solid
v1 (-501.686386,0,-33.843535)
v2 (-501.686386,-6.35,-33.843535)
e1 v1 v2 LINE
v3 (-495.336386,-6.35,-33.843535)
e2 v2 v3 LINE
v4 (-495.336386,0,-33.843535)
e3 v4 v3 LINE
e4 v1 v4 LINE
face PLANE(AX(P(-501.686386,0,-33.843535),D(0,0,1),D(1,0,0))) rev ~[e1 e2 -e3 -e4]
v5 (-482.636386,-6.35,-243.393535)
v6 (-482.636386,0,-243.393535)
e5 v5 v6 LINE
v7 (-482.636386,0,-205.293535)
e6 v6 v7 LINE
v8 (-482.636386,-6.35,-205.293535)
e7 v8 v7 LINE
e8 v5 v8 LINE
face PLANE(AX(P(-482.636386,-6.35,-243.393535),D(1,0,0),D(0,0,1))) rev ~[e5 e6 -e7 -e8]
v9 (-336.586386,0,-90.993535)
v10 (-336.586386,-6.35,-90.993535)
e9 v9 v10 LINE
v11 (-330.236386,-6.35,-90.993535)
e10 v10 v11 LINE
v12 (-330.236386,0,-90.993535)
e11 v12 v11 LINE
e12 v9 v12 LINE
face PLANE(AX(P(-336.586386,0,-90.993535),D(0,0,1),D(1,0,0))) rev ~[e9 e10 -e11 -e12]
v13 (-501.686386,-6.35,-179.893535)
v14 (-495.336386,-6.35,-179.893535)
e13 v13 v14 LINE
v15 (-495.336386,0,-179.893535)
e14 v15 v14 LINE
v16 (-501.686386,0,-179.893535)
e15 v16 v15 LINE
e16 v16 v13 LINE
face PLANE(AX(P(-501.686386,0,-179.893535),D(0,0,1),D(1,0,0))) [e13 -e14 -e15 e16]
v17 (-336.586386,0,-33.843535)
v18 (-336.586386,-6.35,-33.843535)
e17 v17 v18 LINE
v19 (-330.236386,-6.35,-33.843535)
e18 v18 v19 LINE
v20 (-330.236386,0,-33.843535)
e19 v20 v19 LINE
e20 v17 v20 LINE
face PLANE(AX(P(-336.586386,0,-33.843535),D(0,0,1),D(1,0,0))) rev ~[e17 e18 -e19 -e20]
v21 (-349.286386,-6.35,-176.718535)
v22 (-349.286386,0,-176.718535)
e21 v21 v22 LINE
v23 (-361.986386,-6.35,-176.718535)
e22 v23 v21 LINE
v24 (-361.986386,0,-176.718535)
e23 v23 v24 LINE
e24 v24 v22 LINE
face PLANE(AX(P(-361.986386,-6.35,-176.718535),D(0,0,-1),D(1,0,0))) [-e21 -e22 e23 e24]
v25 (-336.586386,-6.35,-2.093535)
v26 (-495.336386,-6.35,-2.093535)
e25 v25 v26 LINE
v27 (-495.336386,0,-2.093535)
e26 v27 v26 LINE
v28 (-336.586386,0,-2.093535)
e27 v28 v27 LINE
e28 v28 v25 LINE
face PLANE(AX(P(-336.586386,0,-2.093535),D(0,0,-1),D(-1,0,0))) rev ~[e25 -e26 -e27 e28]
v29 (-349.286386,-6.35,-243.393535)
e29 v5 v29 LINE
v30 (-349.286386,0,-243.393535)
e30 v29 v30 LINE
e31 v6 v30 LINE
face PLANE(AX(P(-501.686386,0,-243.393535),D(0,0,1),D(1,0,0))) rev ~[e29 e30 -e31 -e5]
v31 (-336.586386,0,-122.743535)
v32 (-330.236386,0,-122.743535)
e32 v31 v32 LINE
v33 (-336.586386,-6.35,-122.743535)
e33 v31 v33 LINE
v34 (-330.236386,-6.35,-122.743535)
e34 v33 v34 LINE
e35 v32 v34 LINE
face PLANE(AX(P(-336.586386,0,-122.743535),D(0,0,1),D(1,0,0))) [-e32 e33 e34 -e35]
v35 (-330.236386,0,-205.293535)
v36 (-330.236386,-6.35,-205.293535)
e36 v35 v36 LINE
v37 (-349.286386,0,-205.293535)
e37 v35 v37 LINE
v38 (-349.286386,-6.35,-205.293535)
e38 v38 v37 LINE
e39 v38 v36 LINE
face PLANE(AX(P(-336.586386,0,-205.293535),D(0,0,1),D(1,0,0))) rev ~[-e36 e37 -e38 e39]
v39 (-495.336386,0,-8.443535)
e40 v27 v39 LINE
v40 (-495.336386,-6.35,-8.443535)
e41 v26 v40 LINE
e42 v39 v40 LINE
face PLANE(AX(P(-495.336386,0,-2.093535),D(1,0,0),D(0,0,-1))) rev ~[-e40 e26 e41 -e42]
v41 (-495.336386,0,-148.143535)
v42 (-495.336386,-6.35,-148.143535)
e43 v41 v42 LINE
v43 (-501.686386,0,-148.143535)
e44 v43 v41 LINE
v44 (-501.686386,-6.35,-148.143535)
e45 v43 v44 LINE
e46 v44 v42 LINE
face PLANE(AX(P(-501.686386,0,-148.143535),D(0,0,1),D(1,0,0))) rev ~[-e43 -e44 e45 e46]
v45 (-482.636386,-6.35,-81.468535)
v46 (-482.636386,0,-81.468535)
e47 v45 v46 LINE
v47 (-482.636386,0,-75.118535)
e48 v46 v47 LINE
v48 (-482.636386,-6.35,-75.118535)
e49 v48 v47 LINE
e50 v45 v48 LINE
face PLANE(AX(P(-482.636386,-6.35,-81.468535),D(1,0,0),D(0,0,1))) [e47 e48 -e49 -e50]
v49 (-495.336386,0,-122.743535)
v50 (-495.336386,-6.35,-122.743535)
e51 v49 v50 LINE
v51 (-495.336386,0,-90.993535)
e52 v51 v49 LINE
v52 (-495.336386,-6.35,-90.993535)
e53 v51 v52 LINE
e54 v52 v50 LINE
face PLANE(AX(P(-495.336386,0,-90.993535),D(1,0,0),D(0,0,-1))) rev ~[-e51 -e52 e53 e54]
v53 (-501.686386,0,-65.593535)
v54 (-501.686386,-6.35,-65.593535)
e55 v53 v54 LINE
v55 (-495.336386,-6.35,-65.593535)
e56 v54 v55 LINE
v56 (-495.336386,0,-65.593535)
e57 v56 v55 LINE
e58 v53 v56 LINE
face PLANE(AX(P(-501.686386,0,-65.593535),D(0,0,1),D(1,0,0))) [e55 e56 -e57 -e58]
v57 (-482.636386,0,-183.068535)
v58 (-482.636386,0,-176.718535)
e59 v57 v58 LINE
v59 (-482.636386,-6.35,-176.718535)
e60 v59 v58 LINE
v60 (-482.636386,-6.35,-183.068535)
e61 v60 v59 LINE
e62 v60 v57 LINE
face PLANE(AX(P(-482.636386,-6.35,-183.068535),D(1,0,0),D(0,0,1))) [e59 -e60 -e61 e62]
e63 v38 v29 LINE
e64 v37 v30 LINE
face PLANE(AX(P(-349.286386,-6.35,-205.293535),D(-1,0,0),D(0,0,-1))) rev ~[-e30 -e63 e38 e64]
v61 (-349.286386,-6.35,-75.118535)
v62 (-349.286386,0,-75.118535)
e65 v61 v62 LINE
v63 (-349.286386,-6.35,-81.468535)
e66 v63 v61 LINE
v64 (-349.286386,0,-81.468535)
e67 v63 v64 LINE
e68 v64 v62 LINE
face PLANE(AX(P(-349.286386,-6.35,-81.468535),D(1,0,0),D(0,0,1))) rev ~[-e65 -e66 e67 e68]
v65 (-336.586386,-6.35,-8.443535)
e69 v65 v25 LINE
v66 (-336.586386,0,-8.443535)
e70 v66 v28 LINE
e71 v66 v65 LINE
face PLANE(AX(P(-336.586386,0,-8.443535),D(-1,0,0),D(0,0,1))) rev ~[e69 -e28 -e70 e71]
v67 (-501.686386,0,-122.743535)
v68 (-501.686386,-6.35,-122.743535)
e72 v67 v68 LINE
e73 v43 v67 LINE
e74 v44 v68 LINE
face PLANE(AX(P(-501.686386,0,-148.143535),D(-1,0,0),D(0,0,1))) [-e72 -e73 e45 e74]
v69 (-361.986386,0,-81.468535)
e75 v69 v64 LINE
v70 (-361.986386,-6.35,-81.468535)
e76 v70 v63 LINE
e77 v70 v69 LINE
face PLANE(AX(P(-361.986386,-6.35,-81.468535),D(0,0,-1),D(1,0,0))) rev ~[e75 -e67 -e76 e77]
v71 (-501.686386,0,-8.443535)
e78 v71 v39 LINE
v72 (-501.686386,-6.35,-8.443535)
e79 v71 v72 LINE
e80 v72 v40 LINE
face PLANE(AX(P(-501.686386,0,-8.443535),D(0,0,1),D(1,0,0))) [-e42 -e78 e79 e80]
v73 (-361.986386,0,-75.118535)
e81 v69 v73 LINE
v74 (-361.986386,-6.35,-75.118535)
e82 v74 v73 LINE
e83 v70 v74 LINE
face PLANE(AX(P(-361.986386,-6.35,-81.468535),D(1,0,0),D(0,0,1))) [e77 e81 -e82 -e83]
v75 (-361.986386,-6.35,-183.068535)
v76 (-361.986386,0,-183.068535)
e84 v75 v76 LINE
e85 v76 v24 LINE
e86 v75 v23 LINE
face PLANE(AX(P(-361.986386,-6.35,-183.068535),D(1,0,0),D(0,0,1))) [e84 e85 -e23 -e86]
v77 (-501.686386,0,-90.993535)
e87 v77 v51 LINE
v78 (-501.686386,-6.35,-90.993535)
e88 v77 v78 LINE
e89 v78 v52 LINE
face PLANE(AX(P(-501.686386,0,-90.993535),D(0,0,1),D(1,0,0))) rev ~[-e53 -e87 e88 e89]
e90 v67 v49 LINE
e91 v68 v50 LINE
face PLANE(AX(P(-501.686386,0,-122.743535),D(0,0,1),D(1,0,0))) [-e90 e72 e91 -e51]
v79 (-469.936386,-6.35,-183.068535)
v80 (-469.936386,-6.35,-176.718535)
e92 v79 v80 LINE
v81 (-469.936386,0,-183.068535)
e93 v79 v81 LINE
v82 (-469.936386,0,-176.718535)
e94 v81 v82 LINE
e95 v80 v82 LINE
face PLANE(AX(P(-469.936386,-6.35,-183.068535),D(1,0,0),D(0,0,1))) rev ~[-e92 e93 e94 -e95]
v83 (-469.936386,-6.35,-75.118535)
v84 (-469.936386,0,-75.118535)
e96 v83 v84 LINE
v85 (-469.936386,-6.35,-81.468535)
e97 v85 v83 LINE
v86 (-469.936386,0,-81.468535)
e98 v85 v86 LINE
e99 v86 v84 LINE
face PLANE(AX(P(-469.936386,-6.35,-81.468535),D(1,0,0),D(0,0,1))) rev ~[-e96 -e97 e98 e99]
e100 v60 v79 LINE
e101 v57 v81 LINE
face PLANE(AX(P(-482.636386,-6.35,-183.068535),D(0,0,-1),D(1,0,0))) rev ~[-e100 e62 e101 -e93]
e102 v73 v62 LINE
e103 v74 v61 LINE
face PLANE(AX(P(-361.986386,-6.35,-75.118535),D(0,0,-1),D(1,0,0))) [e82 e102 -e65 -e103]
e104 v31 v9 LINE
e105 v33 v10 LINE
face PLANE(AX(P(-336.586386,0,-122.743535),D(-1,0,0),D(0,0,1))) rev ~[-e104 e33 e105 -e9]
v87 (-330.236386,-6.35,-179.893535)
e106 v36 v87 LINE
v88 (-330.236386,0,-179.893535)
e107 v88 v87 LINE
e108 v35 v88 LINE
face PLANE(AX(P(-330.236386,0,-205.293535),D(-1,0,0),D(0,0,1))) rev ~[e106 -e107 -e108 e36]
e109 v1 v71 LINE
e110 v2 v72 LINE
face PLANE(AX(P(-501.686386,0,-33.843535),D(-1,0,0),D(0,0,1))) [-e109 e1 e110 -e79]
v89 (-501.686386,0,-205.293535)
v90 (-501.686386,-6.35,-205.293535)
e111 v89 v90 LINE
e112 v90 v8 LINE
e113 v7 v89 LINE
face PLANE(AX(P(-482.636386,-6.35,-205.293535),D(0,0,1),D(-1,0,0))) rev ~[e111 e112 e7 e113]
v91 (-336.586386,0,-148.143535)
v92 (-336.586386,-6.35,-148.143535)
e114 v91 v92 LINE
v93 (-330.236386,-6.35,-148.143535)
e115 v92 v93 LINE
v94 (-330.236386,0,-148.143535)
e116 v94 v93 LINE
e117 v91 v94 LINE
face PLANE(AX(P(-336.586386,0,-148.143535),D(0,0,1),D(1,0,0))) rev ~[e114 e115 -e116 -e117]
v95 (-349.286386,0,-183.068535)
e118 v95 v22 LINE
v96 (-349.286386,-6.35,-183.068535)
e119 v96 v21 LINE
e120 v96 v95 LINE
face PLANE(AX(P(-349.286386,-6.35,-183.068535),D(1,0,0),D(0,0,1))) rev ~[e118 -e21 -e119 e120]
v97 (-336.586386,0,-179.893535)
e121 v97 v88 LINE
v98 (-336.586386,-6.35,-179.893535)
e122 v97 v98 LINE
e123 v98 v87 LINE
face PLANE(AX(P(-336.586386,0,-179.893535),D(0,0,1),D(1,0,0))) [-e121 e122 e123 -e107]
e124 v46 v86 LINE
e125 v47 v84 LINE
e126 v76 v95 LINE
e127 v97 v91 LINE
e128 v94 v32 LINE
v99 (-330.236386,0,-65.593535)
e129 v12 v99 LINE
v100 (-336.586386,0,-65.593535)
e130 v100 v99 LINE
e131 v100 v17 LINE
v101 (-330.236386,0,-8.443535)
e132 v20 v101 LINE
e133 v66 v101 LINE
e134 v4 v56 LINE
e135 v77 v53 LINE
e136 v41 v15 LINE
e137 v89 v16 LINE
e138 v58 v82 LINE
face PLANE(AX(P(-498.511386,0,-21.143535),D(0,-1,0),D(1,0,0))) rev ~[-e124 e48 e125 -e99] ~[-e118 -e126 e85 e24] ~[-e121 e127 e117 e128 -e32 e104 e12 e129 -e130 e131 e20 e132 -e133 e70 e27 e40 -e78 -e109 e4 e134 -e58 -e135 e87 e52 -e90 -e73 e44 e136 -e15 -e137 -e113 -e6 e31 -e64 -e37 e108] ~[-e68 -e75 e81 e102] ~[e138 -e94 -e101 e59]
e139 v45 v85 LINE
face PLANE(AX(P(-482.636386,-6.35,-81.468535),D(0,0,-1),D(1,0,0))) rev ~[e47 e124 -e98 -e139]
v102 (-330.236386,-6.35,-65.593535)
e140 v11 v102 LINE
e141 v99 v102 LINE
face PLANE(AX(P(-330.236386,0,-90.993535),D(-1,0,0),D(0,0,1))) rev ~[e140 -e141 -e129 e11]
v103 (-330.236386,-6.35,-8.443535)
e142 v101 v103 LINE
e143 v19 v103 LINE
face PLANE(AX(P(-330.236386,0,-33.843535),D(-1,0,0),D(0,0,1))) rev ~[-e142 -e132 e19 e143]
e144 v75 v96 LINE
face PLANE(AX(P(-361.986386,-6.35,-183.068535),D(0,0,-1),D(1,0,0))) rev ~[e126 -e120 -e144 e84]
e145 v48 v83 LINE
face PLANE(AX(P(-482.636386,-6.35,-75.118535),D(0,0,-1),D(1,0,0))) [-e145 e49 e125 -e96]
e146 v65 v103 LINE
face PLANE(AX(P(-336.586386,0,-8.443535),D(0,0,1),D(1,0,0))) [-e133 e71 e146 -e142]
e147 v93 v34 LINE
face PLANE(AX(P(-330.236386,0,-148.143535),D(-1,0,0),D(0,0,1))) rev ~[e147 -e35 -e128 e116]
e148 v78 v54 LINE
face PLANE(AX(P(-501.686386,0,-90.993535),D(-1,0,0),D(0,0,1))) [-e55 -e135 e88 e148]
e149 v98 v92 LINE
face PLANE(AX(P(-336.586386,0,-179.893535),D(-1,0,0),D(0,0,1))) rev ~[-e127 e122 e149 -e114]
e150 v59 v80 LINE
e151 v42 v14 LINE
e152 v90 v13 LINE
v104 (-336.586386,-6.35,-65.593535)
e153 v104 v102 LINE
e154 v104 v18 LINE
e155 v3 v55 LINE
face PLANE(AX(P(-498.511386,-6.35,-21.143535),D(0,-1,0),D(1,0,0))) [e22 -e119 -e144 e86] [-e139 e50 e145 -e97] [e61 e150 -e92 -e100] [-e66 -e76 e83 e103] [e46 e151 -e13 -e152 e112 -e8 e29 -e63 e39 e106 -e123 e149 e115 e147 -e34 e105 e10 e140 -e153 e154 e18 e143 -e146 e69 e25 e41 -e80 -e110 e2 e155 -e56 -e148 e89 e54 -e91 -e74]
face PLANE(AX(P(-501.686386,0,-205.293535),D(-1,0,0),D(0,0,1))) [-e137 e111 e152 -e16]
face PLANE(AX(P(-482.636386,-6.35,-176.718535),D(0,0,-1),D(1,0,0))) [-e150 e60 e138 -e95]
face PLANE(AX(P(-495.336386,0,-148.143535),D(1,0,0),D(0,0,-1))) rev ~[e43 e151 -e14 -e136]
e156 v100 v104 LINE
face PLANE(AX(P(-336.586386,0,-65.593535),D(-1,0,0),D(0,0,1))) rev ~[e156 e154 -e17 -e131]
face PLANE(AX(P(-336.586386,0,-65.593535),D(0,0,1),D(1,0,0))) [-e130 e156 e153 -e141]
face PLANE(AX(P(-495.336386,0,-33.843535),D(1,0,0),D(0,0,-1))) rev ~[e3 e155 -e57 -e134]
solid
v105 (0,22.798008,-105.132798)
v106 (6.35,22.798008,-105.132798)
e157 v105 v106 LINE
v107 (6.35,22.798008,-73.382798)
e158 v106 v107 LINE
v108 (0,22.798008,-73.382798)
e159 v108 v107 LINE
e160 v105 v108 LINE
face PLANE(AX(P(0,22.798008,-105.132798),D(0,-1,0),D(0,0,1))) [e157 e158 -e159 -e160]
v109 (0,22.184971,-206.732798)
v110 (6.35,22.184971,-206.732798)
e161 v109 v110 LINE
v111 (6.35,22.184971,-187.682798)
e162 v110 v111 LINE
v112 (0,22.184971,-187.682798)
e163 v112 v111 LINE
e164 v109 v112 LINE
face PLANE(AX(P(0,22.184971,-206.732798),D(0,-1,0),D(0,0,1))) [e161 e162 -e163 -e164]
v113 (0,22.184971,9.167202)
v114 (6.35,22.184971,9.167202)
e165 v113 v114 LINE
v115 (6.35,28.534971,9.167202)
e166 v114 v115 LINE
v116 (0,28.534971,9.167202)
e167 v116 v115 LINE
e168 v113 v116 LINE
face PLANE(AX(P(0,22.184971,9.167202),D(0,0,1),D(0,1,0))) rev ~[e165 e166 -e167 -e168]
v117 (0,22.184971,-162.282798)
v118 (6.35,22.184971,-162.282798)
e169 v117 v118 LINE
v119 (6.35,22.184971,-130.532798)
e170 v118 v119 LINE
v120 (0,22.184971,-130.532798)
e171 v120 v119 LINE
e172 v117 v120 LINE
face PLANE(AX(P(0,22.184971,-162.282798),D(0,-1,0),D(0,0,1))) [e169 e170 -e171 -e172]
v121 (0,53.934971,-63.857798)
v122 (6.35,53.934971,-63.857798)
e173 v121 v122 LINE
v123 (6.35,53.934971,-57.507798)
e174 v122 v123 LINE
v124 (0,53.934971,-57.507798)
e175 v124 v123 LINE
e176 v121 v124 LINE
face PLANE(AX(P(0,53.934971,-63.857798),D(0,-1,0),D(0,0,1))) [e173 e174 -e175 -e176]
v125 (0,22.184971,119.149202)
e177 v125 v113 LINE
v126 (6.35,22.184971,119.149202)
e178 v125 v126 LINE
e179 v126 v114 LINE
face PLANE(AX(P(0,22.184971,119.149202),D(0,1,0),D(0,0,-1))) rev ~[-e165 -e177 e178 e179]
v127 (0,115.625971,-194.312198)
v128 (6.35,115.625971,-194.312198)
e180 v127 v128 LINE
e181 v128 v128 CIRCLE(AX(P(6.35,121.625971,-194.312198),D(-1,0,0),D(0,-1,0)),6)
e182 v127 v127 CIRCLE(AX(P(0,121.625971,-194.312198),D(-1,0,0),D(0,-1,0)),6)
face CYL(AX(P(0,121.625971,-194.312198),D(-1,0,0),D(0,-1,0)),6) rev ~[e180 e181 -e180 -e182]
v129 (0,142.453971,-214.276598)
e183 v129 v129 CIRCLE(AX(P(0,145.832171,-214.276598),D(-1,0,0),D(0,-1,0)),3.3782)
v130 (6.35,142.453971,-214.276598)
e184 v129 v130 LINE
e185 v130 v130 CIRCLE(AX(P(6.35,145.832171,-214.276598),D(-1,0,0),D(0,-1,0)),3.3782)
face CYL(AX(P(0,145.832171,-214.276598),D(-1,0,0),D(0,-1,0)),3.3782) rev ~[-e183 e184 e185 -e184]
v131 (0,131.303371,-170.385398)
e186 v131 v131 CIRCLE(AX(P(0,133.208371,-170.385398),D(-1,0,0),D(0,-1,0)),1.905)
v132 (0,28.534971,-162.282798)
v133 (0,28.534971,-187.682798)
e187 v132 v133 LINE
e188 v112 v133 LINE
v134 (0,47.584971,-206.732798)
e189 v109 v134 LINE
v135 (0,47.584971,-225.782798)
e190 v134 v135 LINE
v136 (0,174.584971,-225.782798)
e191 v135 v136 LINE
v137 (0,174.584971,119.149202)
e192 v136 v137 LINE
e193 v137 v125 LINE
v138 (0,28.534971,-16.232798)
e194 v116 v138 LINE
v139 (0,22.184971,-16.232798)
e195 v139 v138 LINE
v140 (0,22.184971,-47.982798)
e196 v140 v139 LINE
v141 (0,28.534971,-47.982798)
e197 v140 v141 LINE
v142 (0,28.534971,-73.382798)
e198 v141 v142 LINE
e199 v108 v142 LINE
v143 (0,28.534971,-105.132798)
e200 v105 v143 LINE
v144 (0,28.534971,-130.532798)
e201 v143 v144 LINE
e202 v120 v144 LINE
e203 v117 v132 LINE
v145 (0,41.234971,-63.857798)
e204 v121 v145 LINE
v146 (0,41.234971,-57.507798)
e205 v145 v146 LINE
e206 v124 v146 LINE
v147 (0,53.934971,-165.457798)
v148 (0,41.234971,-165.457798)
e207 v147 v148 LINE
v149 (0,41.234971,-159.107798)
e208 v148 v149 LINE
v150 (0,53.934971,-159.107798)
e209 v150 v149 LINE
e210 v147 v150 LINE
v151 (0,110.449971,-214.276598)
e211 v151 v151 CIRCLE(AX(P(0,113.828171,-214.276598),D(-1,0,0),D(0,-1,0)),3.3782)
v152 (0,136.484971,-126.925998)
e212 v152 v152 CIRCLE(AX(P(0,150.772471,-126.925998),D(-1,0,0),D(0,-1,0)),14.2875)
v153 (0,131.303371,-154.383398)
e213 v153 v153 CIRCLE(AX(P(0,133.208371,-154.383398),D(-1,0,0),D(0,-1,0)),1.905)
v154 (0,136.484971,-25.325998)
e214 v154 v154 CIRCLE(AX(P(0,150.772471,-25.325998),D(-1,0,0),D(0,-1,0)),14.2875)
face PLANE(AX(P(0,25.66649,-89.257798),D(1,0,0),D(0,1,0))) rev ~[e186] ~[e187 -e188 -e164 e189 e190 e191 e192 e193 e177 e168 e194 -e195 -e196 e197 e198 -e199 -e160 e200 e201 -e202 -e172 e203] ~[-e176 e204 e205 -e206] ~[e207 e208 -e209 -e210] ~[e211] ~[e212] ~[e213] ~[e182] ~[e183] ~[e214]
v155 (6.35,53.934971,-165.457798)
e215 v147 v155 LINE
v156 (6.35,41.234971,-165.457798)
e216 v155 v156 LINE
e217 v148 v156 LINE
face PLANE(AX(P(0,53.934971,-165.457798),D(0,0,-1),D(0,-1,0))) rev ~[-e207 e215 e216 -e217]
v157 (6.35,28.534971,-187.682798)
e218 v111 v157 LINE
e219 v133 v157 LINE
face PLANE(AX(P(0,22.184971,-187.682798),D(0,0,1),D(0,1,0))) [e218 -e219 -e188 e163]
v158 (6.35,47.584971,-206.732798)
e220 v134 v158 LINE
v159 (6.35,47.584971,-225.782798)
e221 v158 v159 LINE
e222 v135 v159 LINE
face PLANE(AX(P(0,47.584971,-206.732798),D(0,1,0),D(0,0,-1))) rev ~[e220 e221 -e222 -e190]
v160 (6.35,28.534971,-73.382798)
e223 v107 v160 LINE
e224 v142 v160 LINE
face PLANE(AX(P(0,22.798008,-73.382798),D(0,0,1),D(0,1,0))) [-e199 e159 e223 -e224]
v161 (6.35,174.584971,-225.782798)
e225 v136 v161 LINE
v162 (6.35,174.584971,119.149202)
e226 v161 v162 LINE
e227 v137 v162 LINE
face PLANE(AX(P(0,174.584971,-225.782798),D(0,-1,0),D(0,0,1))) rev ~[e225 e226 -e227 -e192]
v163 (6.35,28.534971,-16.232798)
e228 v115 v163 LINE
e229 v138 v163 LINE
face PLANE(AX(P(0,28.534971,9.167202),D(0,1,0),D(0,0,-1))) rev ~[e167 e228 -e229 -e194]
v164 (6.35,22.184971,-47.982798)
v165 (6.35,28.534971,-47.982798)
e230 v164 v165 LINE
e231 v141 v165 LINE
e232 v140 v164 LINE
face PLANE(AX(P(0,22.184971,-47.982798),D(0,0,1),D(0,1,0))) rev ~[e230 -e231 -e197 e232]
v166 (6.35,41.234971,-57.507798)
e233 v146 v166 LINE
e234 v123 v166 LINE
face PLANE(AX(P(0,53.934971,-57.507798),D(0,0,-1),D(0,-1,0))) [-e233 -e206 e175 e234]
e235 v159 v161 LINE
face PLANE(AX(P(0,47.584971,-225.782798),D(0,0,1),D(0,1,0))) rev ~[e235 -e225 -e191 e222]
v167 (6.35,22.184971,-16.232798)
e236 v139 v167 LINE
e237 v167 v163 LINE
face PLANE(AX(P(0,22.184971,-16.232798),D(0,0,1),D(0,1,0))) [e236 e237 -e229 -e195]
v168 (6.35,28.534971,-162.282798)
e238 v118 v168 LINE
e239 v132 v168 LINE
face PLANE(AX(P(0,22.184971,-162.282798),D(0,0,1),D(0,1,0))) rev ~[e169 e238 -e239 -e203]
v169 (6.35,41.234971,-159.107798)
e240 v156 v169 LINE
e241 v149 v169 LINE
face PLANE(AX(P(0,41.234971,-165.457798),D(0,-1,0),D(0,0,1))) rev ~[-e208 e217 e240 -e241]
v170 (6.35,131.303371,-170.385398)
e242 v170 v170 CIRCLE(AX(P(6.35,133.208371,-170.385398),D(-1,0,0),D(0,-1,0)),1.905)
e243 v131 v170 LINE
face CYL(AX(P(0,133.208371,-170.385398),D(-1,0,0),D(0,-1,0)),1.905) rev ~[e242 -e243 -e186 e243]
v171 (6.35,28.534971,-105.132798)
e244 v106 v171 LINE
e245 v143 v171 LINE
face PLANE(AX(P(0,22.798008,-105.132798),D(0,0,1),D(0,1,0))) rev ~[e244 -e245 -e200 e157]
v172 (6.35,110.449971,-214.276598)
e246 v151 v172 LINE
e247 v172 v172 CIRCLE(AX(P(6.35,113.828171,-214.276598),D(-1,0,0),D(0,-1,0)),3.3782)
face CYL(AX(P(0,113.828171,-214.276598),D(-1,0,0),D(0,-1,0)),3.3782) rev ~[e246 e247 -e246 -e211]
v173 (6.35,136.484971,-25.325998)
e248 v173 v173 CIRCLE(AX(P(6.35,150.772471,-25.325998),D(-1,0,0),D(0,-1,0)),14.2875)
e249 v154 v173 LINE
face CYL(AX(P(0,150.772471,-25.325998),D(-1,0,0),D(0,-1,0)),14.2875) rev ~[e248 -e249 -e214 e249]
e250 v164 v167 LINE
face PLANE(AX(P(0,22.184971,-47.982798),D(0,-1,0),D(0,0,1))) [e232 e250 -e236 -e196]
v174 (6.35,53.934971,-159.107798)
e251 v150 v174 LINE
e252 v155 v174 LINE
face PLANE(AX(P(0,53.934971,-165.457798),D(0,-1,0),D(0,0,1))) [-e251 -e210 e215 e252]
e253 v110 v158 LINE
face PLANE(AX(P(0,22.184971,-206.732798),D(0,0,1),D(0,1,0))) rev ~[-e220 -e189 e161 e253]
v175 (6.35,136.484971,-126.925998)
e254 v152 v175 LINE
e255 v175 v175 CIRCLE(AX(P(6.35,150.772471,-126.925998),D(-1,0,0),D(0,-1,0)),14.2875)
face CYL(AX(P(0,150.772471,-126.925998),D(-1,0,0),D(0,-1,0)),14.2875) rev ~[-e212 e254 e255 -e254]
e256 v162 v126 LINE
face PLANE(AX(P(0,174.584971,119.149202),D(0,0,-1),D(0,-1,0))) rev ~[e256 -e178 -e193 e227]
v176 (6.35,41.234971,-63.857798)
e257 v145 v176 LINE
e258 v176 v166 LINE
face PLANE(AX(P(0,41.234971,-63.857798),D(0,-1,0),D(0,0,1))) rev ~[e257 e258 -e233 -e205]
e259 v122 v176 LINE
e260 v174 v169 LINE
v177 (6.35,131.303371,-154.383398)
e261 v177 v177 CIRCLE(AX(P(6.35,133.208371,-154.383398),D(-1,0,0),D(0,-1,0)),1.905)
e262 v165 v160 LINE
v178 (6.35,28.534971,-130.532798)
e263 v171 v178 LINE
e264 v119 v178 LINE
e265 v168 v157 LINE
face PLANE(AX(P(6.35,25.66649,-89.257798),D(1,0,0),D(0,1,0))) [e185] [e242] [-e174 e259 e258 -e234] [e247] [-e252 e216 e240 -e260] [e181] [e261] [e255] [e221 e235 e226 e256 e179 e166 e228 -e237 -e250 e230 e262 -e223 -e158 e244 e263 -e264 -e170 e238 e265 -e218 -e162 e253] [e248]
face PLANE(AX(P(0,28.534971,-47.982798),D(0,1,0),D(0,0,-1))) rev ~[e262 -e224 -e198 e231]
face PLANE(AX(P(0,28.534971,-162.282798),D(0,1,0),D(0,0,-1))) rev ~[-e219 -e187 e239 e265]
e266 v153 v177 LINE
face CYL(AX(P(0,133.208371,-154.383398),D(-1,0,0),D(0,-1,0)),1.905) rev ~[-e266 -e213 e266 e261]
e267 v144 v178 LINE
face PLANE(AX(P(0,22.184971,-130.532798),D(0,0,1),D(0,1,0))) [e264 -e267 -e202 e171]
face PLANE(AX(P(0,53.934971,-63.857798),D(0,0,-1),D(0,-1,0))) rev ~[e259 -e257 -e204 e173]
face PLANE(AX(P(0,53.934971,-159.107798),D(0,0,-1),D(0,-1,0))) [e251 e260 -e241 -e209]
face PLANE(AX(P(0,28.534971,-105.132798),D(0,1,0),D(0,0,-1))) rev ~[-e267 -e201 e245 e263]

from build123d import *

# Parameters (mm, degrees)
F0_W      = 6.35
F0_H      = 25.4
F0_H_2    = 6.35
F1_DEPTH  = 6.35
F2_W      = 5.7369639019
F2_H      = 31.75
F2_W_2    = 6.35
F2_H_2    = 19.05
F2_H_3    = 103.632
F2_H_4    = 6.35
F3_DEPTH  = 6.35
F4_R      = 14.2875
F5_DEPTH  = 6.35
F6_W      = 12.7
F6_H      = 6.35
F7_DEPTH  = 6.35
F8_W      = 12.7
F8_H      = 6.35
F9_DEPTH  = 6.35
F11_DEPTH = 6.35
F12_R     = 6
F13_DEPTH = 25.4
F14_R     = 3.3782
F14_R_2   = 1.905
F15_DEPTH = 6.35


# Not quite as in the source:
# - a feature names something its author has since deleted; it is built from what else it names


with BuildPart() as f1:
    # F0 (on Front) → F1 (new body)
    with BuildSketch(Plane.XZ):
        with Locations((-498.5113858938, -21.1435346045)):
            Rectangle(F0_W, F0_H)
        with Locations((-498.5113858938, -78.2935346045)):
            Rectangle(F0_W, F0_H)
        with Locations((-498.5113858938, -135.4435346045)):
            Rectangle(F0_W, F0_H)
        with Locations((-498.5113858938, -192.5935346045)):
            Rectangle(F0_W, F0_H)
        with Locations((-498.5113858938, -240.2185346045)):
            Rectangle(F0_W, F0_H_2)
        with Locations((-333.4113858938, -240.2185346045)):
            Rectangle(F0_W, F0_H_2)
        with Locations((-333.4113858938, -192.5935346045)):
            Rectangle(F0_W, F0_H)
        with Locations((-333.4113858938, -135.4435346045)):
            Rectangle(F0_W, F0_H)
        with Locations((-333.4113858938, -78.2935346045)):
            Rectangle(F0_W, F0_H)
        with Locations((-333.4113858938, -21.1435346045)):
            Rectangle(F0_W, F0_H)
        Polygon((-495.3363858938, -237.0435346045), (-495.3363858938, -243.3935346045), (-336.5863858938, -243.3935346045), (-336.5863858938, -237.0435346045), (-336.5863858938, -205.2935346045), (-336.5863858938, -179.8935346045), (-336.5863858938, -148.1435346045), (-336.5863858938, -122.7435346045), (-336.5863858938, -90.9935346045), (-336.5863858938, -65.5935346045), (-336.5863858938, -33.8435346045), (-336.5863858938, -8.4435346045), (-336.5863858938, -2.0935346045), (-495.3363858938, -2.0935346045), (-495.3363858938, -8.4435346045), (-495.3363858938, -33.8435346045), (-495.3363858938, -65.5935346045), (-495.3363858938, -90.9935346045), (-495.3363858938, -122.7435346045), (-495.3363858938, -148.1435346045), (-495.3363858938, -179.8935346045), (-495.3363858938, -205.2935346045), align=None)
    extrude(amount=F1_DEPTH)

    # F8 (on face) → F9 (cut)
    with BuildSketch(Plane.XZ.offset(6.35)):
        with Locations((-476.2863858938, -78.2935346045)):
            Rectangle(F8_W, F8_H)
        with Locations((-476.2863858938, -179.8935346045)):
            Rectangle(F8_W, F8_H)
        with Locations((-355.6363858938, -78.2935346045)):
            Rectangle(F8_W, F8_H)
        with Locations((-355.6363858938, -179.8935346045)):
            Rectangle(F8_W, F8_H)
    extrude(amount=-F9_DEPTH, mode=Mode.SUBTRACT)

    # F10 (on face) → F11 (cut)
    with BuildSketch(Plane.XZ.offset(6.35)):
        Polygon((-501.6863858938, -243.3935346045), (-482.6363858938, -243.3935346045), (-482.6363858938, -205.2935346045), (-495.3363858938, -205.2935346045), (-495.3363858938, -237.0435346045), (-501.6863858938, -237.0435346045), align=None)
        Polygon((-349.2863858938, -205.2935346045), (-349.2863858938, -243.3935346045), (-330.2363858938, -243.3935346045), (-330.2363858938, -237.0435346045), (-336.5863858938, -237.0435346045), (-336.5863858938, -205.2935346045), align=None)
    extrude(amount=-F11_DEPTH, mode=Mode.SUBTRACT)


with BuildPart() as f3:
    # F2 (on Right) → F3 (new body)
    with BuildSketch(Plane.YZ):
        with Locations((25.6664895297, -89.2577976048)):
            Rectangle(F2_W, F2_H)
        with Locations((25.3599714807, -32.1077976048)):
            Rectangle(F2_W_2, F2_H)
        with Locations((25.3599714807, -146.4077976048)):
            Rectangle(F2_W_2, F2_H)
        with Locations((25.3599714807, -197.2077976048)):
            Rectangle(F2_W_2, F2_H_2)
        with Locations((25.3599714807, 67.3332023952)):
            Rectangle(F2_W_2, F2_H_3)
        with Locations((25.3599714807, 12.3422023952)):
            Rectangle(F2_W_2, F2_H_4)
        Polygon((28.5349714807, 9.1672023952), (28.5349714807, -16.2327976048), (28.5349714807, -47.9827976048), (28.5349714807, -73.3827976048), (28.5349714807, -105.1327976048), (28.5349714807, -130.5327976048), (28.5349714807, -162.2827976048), (28.5349714807, -187.6827976048), (28.5349714807, -206.7327976048), (47.5849714807, -206.7327976048), (47.5849714807, -225.7827976048), (174.5849714807, -225.7827976048), (174.5849714807, 119.1492023952), (28.5349714807, 119.1492023952), (28.5349714807, 15.5172023952), align=None)
    extrude(amount=F3_DEPTH)

    # F4 (on face) → F5 (cut)
    with BuildSketch(Plane(origin=(0, 0, 0), x_dir=(0, -1, 0), z_dir=(-1, 0, 0))):
        with Locations((-150.7724714807, -25.3259976048)):
            Circle(F4_R)
        with Locations((-150.7724714807, -126.9259976048)):
            Circle(F4_R)
    extrude(amount=-F5_DEPTH, mode=Mode.SUBTRACT)

    # F6 (on face) → F7 (cut)
    with BuildSketch(Plane(origin=(0, 0, 0), x_dir=(0, -1, 0), z_dir=(-1, 0, 0))):
        with Locations((-47.5849714807, -60.6827976048)):
            Rectangle(F6_W, F6_H)
        with Locations((-47.5849714807, -162.2827976048)):
            Rectangle(F6_W, F6_H)
    extrude(amount=-F7_DEPTH, mode=Mode.SUBTRACT)

    # F12 (on face) → F13 (cut)
    with BuildSketch(Plane(origin=(0, 0, 0), x_dir=(0, -1, 0), z_dir=(-1, 0, 0))):
        with Locations((-121.6259714807, -194.3121976048)):
            Circle(F12_R)
    extrude(amount=-F13_DEPTH, mode=Mode.SUBTRACT)

    # F14 (on face) → F15 (cut)
    with BuildSketch(Plane(origin=(0, 0, 0), x_dir=(0, -1, 0), z_dir=(-1, 0, 0))):
        with Locations((-145.8321714807, -214.2765976048)):
            Circle(F14_R)
        with Locations((-113.8281714807, -214.2765976048)):
            Circle(F14_R)
        with Locations((-133.2083714807, -170.3853976048)):
            Circle(F14_R_2)
        with Locations((-133.2083714807, -154.3833976048)):
            Circle(F14_R_2)
    extrude(amount=-F15_DEPTH, mode=Mode.SUBTRACT)


solid = Compound([f1.part, f3.part])
